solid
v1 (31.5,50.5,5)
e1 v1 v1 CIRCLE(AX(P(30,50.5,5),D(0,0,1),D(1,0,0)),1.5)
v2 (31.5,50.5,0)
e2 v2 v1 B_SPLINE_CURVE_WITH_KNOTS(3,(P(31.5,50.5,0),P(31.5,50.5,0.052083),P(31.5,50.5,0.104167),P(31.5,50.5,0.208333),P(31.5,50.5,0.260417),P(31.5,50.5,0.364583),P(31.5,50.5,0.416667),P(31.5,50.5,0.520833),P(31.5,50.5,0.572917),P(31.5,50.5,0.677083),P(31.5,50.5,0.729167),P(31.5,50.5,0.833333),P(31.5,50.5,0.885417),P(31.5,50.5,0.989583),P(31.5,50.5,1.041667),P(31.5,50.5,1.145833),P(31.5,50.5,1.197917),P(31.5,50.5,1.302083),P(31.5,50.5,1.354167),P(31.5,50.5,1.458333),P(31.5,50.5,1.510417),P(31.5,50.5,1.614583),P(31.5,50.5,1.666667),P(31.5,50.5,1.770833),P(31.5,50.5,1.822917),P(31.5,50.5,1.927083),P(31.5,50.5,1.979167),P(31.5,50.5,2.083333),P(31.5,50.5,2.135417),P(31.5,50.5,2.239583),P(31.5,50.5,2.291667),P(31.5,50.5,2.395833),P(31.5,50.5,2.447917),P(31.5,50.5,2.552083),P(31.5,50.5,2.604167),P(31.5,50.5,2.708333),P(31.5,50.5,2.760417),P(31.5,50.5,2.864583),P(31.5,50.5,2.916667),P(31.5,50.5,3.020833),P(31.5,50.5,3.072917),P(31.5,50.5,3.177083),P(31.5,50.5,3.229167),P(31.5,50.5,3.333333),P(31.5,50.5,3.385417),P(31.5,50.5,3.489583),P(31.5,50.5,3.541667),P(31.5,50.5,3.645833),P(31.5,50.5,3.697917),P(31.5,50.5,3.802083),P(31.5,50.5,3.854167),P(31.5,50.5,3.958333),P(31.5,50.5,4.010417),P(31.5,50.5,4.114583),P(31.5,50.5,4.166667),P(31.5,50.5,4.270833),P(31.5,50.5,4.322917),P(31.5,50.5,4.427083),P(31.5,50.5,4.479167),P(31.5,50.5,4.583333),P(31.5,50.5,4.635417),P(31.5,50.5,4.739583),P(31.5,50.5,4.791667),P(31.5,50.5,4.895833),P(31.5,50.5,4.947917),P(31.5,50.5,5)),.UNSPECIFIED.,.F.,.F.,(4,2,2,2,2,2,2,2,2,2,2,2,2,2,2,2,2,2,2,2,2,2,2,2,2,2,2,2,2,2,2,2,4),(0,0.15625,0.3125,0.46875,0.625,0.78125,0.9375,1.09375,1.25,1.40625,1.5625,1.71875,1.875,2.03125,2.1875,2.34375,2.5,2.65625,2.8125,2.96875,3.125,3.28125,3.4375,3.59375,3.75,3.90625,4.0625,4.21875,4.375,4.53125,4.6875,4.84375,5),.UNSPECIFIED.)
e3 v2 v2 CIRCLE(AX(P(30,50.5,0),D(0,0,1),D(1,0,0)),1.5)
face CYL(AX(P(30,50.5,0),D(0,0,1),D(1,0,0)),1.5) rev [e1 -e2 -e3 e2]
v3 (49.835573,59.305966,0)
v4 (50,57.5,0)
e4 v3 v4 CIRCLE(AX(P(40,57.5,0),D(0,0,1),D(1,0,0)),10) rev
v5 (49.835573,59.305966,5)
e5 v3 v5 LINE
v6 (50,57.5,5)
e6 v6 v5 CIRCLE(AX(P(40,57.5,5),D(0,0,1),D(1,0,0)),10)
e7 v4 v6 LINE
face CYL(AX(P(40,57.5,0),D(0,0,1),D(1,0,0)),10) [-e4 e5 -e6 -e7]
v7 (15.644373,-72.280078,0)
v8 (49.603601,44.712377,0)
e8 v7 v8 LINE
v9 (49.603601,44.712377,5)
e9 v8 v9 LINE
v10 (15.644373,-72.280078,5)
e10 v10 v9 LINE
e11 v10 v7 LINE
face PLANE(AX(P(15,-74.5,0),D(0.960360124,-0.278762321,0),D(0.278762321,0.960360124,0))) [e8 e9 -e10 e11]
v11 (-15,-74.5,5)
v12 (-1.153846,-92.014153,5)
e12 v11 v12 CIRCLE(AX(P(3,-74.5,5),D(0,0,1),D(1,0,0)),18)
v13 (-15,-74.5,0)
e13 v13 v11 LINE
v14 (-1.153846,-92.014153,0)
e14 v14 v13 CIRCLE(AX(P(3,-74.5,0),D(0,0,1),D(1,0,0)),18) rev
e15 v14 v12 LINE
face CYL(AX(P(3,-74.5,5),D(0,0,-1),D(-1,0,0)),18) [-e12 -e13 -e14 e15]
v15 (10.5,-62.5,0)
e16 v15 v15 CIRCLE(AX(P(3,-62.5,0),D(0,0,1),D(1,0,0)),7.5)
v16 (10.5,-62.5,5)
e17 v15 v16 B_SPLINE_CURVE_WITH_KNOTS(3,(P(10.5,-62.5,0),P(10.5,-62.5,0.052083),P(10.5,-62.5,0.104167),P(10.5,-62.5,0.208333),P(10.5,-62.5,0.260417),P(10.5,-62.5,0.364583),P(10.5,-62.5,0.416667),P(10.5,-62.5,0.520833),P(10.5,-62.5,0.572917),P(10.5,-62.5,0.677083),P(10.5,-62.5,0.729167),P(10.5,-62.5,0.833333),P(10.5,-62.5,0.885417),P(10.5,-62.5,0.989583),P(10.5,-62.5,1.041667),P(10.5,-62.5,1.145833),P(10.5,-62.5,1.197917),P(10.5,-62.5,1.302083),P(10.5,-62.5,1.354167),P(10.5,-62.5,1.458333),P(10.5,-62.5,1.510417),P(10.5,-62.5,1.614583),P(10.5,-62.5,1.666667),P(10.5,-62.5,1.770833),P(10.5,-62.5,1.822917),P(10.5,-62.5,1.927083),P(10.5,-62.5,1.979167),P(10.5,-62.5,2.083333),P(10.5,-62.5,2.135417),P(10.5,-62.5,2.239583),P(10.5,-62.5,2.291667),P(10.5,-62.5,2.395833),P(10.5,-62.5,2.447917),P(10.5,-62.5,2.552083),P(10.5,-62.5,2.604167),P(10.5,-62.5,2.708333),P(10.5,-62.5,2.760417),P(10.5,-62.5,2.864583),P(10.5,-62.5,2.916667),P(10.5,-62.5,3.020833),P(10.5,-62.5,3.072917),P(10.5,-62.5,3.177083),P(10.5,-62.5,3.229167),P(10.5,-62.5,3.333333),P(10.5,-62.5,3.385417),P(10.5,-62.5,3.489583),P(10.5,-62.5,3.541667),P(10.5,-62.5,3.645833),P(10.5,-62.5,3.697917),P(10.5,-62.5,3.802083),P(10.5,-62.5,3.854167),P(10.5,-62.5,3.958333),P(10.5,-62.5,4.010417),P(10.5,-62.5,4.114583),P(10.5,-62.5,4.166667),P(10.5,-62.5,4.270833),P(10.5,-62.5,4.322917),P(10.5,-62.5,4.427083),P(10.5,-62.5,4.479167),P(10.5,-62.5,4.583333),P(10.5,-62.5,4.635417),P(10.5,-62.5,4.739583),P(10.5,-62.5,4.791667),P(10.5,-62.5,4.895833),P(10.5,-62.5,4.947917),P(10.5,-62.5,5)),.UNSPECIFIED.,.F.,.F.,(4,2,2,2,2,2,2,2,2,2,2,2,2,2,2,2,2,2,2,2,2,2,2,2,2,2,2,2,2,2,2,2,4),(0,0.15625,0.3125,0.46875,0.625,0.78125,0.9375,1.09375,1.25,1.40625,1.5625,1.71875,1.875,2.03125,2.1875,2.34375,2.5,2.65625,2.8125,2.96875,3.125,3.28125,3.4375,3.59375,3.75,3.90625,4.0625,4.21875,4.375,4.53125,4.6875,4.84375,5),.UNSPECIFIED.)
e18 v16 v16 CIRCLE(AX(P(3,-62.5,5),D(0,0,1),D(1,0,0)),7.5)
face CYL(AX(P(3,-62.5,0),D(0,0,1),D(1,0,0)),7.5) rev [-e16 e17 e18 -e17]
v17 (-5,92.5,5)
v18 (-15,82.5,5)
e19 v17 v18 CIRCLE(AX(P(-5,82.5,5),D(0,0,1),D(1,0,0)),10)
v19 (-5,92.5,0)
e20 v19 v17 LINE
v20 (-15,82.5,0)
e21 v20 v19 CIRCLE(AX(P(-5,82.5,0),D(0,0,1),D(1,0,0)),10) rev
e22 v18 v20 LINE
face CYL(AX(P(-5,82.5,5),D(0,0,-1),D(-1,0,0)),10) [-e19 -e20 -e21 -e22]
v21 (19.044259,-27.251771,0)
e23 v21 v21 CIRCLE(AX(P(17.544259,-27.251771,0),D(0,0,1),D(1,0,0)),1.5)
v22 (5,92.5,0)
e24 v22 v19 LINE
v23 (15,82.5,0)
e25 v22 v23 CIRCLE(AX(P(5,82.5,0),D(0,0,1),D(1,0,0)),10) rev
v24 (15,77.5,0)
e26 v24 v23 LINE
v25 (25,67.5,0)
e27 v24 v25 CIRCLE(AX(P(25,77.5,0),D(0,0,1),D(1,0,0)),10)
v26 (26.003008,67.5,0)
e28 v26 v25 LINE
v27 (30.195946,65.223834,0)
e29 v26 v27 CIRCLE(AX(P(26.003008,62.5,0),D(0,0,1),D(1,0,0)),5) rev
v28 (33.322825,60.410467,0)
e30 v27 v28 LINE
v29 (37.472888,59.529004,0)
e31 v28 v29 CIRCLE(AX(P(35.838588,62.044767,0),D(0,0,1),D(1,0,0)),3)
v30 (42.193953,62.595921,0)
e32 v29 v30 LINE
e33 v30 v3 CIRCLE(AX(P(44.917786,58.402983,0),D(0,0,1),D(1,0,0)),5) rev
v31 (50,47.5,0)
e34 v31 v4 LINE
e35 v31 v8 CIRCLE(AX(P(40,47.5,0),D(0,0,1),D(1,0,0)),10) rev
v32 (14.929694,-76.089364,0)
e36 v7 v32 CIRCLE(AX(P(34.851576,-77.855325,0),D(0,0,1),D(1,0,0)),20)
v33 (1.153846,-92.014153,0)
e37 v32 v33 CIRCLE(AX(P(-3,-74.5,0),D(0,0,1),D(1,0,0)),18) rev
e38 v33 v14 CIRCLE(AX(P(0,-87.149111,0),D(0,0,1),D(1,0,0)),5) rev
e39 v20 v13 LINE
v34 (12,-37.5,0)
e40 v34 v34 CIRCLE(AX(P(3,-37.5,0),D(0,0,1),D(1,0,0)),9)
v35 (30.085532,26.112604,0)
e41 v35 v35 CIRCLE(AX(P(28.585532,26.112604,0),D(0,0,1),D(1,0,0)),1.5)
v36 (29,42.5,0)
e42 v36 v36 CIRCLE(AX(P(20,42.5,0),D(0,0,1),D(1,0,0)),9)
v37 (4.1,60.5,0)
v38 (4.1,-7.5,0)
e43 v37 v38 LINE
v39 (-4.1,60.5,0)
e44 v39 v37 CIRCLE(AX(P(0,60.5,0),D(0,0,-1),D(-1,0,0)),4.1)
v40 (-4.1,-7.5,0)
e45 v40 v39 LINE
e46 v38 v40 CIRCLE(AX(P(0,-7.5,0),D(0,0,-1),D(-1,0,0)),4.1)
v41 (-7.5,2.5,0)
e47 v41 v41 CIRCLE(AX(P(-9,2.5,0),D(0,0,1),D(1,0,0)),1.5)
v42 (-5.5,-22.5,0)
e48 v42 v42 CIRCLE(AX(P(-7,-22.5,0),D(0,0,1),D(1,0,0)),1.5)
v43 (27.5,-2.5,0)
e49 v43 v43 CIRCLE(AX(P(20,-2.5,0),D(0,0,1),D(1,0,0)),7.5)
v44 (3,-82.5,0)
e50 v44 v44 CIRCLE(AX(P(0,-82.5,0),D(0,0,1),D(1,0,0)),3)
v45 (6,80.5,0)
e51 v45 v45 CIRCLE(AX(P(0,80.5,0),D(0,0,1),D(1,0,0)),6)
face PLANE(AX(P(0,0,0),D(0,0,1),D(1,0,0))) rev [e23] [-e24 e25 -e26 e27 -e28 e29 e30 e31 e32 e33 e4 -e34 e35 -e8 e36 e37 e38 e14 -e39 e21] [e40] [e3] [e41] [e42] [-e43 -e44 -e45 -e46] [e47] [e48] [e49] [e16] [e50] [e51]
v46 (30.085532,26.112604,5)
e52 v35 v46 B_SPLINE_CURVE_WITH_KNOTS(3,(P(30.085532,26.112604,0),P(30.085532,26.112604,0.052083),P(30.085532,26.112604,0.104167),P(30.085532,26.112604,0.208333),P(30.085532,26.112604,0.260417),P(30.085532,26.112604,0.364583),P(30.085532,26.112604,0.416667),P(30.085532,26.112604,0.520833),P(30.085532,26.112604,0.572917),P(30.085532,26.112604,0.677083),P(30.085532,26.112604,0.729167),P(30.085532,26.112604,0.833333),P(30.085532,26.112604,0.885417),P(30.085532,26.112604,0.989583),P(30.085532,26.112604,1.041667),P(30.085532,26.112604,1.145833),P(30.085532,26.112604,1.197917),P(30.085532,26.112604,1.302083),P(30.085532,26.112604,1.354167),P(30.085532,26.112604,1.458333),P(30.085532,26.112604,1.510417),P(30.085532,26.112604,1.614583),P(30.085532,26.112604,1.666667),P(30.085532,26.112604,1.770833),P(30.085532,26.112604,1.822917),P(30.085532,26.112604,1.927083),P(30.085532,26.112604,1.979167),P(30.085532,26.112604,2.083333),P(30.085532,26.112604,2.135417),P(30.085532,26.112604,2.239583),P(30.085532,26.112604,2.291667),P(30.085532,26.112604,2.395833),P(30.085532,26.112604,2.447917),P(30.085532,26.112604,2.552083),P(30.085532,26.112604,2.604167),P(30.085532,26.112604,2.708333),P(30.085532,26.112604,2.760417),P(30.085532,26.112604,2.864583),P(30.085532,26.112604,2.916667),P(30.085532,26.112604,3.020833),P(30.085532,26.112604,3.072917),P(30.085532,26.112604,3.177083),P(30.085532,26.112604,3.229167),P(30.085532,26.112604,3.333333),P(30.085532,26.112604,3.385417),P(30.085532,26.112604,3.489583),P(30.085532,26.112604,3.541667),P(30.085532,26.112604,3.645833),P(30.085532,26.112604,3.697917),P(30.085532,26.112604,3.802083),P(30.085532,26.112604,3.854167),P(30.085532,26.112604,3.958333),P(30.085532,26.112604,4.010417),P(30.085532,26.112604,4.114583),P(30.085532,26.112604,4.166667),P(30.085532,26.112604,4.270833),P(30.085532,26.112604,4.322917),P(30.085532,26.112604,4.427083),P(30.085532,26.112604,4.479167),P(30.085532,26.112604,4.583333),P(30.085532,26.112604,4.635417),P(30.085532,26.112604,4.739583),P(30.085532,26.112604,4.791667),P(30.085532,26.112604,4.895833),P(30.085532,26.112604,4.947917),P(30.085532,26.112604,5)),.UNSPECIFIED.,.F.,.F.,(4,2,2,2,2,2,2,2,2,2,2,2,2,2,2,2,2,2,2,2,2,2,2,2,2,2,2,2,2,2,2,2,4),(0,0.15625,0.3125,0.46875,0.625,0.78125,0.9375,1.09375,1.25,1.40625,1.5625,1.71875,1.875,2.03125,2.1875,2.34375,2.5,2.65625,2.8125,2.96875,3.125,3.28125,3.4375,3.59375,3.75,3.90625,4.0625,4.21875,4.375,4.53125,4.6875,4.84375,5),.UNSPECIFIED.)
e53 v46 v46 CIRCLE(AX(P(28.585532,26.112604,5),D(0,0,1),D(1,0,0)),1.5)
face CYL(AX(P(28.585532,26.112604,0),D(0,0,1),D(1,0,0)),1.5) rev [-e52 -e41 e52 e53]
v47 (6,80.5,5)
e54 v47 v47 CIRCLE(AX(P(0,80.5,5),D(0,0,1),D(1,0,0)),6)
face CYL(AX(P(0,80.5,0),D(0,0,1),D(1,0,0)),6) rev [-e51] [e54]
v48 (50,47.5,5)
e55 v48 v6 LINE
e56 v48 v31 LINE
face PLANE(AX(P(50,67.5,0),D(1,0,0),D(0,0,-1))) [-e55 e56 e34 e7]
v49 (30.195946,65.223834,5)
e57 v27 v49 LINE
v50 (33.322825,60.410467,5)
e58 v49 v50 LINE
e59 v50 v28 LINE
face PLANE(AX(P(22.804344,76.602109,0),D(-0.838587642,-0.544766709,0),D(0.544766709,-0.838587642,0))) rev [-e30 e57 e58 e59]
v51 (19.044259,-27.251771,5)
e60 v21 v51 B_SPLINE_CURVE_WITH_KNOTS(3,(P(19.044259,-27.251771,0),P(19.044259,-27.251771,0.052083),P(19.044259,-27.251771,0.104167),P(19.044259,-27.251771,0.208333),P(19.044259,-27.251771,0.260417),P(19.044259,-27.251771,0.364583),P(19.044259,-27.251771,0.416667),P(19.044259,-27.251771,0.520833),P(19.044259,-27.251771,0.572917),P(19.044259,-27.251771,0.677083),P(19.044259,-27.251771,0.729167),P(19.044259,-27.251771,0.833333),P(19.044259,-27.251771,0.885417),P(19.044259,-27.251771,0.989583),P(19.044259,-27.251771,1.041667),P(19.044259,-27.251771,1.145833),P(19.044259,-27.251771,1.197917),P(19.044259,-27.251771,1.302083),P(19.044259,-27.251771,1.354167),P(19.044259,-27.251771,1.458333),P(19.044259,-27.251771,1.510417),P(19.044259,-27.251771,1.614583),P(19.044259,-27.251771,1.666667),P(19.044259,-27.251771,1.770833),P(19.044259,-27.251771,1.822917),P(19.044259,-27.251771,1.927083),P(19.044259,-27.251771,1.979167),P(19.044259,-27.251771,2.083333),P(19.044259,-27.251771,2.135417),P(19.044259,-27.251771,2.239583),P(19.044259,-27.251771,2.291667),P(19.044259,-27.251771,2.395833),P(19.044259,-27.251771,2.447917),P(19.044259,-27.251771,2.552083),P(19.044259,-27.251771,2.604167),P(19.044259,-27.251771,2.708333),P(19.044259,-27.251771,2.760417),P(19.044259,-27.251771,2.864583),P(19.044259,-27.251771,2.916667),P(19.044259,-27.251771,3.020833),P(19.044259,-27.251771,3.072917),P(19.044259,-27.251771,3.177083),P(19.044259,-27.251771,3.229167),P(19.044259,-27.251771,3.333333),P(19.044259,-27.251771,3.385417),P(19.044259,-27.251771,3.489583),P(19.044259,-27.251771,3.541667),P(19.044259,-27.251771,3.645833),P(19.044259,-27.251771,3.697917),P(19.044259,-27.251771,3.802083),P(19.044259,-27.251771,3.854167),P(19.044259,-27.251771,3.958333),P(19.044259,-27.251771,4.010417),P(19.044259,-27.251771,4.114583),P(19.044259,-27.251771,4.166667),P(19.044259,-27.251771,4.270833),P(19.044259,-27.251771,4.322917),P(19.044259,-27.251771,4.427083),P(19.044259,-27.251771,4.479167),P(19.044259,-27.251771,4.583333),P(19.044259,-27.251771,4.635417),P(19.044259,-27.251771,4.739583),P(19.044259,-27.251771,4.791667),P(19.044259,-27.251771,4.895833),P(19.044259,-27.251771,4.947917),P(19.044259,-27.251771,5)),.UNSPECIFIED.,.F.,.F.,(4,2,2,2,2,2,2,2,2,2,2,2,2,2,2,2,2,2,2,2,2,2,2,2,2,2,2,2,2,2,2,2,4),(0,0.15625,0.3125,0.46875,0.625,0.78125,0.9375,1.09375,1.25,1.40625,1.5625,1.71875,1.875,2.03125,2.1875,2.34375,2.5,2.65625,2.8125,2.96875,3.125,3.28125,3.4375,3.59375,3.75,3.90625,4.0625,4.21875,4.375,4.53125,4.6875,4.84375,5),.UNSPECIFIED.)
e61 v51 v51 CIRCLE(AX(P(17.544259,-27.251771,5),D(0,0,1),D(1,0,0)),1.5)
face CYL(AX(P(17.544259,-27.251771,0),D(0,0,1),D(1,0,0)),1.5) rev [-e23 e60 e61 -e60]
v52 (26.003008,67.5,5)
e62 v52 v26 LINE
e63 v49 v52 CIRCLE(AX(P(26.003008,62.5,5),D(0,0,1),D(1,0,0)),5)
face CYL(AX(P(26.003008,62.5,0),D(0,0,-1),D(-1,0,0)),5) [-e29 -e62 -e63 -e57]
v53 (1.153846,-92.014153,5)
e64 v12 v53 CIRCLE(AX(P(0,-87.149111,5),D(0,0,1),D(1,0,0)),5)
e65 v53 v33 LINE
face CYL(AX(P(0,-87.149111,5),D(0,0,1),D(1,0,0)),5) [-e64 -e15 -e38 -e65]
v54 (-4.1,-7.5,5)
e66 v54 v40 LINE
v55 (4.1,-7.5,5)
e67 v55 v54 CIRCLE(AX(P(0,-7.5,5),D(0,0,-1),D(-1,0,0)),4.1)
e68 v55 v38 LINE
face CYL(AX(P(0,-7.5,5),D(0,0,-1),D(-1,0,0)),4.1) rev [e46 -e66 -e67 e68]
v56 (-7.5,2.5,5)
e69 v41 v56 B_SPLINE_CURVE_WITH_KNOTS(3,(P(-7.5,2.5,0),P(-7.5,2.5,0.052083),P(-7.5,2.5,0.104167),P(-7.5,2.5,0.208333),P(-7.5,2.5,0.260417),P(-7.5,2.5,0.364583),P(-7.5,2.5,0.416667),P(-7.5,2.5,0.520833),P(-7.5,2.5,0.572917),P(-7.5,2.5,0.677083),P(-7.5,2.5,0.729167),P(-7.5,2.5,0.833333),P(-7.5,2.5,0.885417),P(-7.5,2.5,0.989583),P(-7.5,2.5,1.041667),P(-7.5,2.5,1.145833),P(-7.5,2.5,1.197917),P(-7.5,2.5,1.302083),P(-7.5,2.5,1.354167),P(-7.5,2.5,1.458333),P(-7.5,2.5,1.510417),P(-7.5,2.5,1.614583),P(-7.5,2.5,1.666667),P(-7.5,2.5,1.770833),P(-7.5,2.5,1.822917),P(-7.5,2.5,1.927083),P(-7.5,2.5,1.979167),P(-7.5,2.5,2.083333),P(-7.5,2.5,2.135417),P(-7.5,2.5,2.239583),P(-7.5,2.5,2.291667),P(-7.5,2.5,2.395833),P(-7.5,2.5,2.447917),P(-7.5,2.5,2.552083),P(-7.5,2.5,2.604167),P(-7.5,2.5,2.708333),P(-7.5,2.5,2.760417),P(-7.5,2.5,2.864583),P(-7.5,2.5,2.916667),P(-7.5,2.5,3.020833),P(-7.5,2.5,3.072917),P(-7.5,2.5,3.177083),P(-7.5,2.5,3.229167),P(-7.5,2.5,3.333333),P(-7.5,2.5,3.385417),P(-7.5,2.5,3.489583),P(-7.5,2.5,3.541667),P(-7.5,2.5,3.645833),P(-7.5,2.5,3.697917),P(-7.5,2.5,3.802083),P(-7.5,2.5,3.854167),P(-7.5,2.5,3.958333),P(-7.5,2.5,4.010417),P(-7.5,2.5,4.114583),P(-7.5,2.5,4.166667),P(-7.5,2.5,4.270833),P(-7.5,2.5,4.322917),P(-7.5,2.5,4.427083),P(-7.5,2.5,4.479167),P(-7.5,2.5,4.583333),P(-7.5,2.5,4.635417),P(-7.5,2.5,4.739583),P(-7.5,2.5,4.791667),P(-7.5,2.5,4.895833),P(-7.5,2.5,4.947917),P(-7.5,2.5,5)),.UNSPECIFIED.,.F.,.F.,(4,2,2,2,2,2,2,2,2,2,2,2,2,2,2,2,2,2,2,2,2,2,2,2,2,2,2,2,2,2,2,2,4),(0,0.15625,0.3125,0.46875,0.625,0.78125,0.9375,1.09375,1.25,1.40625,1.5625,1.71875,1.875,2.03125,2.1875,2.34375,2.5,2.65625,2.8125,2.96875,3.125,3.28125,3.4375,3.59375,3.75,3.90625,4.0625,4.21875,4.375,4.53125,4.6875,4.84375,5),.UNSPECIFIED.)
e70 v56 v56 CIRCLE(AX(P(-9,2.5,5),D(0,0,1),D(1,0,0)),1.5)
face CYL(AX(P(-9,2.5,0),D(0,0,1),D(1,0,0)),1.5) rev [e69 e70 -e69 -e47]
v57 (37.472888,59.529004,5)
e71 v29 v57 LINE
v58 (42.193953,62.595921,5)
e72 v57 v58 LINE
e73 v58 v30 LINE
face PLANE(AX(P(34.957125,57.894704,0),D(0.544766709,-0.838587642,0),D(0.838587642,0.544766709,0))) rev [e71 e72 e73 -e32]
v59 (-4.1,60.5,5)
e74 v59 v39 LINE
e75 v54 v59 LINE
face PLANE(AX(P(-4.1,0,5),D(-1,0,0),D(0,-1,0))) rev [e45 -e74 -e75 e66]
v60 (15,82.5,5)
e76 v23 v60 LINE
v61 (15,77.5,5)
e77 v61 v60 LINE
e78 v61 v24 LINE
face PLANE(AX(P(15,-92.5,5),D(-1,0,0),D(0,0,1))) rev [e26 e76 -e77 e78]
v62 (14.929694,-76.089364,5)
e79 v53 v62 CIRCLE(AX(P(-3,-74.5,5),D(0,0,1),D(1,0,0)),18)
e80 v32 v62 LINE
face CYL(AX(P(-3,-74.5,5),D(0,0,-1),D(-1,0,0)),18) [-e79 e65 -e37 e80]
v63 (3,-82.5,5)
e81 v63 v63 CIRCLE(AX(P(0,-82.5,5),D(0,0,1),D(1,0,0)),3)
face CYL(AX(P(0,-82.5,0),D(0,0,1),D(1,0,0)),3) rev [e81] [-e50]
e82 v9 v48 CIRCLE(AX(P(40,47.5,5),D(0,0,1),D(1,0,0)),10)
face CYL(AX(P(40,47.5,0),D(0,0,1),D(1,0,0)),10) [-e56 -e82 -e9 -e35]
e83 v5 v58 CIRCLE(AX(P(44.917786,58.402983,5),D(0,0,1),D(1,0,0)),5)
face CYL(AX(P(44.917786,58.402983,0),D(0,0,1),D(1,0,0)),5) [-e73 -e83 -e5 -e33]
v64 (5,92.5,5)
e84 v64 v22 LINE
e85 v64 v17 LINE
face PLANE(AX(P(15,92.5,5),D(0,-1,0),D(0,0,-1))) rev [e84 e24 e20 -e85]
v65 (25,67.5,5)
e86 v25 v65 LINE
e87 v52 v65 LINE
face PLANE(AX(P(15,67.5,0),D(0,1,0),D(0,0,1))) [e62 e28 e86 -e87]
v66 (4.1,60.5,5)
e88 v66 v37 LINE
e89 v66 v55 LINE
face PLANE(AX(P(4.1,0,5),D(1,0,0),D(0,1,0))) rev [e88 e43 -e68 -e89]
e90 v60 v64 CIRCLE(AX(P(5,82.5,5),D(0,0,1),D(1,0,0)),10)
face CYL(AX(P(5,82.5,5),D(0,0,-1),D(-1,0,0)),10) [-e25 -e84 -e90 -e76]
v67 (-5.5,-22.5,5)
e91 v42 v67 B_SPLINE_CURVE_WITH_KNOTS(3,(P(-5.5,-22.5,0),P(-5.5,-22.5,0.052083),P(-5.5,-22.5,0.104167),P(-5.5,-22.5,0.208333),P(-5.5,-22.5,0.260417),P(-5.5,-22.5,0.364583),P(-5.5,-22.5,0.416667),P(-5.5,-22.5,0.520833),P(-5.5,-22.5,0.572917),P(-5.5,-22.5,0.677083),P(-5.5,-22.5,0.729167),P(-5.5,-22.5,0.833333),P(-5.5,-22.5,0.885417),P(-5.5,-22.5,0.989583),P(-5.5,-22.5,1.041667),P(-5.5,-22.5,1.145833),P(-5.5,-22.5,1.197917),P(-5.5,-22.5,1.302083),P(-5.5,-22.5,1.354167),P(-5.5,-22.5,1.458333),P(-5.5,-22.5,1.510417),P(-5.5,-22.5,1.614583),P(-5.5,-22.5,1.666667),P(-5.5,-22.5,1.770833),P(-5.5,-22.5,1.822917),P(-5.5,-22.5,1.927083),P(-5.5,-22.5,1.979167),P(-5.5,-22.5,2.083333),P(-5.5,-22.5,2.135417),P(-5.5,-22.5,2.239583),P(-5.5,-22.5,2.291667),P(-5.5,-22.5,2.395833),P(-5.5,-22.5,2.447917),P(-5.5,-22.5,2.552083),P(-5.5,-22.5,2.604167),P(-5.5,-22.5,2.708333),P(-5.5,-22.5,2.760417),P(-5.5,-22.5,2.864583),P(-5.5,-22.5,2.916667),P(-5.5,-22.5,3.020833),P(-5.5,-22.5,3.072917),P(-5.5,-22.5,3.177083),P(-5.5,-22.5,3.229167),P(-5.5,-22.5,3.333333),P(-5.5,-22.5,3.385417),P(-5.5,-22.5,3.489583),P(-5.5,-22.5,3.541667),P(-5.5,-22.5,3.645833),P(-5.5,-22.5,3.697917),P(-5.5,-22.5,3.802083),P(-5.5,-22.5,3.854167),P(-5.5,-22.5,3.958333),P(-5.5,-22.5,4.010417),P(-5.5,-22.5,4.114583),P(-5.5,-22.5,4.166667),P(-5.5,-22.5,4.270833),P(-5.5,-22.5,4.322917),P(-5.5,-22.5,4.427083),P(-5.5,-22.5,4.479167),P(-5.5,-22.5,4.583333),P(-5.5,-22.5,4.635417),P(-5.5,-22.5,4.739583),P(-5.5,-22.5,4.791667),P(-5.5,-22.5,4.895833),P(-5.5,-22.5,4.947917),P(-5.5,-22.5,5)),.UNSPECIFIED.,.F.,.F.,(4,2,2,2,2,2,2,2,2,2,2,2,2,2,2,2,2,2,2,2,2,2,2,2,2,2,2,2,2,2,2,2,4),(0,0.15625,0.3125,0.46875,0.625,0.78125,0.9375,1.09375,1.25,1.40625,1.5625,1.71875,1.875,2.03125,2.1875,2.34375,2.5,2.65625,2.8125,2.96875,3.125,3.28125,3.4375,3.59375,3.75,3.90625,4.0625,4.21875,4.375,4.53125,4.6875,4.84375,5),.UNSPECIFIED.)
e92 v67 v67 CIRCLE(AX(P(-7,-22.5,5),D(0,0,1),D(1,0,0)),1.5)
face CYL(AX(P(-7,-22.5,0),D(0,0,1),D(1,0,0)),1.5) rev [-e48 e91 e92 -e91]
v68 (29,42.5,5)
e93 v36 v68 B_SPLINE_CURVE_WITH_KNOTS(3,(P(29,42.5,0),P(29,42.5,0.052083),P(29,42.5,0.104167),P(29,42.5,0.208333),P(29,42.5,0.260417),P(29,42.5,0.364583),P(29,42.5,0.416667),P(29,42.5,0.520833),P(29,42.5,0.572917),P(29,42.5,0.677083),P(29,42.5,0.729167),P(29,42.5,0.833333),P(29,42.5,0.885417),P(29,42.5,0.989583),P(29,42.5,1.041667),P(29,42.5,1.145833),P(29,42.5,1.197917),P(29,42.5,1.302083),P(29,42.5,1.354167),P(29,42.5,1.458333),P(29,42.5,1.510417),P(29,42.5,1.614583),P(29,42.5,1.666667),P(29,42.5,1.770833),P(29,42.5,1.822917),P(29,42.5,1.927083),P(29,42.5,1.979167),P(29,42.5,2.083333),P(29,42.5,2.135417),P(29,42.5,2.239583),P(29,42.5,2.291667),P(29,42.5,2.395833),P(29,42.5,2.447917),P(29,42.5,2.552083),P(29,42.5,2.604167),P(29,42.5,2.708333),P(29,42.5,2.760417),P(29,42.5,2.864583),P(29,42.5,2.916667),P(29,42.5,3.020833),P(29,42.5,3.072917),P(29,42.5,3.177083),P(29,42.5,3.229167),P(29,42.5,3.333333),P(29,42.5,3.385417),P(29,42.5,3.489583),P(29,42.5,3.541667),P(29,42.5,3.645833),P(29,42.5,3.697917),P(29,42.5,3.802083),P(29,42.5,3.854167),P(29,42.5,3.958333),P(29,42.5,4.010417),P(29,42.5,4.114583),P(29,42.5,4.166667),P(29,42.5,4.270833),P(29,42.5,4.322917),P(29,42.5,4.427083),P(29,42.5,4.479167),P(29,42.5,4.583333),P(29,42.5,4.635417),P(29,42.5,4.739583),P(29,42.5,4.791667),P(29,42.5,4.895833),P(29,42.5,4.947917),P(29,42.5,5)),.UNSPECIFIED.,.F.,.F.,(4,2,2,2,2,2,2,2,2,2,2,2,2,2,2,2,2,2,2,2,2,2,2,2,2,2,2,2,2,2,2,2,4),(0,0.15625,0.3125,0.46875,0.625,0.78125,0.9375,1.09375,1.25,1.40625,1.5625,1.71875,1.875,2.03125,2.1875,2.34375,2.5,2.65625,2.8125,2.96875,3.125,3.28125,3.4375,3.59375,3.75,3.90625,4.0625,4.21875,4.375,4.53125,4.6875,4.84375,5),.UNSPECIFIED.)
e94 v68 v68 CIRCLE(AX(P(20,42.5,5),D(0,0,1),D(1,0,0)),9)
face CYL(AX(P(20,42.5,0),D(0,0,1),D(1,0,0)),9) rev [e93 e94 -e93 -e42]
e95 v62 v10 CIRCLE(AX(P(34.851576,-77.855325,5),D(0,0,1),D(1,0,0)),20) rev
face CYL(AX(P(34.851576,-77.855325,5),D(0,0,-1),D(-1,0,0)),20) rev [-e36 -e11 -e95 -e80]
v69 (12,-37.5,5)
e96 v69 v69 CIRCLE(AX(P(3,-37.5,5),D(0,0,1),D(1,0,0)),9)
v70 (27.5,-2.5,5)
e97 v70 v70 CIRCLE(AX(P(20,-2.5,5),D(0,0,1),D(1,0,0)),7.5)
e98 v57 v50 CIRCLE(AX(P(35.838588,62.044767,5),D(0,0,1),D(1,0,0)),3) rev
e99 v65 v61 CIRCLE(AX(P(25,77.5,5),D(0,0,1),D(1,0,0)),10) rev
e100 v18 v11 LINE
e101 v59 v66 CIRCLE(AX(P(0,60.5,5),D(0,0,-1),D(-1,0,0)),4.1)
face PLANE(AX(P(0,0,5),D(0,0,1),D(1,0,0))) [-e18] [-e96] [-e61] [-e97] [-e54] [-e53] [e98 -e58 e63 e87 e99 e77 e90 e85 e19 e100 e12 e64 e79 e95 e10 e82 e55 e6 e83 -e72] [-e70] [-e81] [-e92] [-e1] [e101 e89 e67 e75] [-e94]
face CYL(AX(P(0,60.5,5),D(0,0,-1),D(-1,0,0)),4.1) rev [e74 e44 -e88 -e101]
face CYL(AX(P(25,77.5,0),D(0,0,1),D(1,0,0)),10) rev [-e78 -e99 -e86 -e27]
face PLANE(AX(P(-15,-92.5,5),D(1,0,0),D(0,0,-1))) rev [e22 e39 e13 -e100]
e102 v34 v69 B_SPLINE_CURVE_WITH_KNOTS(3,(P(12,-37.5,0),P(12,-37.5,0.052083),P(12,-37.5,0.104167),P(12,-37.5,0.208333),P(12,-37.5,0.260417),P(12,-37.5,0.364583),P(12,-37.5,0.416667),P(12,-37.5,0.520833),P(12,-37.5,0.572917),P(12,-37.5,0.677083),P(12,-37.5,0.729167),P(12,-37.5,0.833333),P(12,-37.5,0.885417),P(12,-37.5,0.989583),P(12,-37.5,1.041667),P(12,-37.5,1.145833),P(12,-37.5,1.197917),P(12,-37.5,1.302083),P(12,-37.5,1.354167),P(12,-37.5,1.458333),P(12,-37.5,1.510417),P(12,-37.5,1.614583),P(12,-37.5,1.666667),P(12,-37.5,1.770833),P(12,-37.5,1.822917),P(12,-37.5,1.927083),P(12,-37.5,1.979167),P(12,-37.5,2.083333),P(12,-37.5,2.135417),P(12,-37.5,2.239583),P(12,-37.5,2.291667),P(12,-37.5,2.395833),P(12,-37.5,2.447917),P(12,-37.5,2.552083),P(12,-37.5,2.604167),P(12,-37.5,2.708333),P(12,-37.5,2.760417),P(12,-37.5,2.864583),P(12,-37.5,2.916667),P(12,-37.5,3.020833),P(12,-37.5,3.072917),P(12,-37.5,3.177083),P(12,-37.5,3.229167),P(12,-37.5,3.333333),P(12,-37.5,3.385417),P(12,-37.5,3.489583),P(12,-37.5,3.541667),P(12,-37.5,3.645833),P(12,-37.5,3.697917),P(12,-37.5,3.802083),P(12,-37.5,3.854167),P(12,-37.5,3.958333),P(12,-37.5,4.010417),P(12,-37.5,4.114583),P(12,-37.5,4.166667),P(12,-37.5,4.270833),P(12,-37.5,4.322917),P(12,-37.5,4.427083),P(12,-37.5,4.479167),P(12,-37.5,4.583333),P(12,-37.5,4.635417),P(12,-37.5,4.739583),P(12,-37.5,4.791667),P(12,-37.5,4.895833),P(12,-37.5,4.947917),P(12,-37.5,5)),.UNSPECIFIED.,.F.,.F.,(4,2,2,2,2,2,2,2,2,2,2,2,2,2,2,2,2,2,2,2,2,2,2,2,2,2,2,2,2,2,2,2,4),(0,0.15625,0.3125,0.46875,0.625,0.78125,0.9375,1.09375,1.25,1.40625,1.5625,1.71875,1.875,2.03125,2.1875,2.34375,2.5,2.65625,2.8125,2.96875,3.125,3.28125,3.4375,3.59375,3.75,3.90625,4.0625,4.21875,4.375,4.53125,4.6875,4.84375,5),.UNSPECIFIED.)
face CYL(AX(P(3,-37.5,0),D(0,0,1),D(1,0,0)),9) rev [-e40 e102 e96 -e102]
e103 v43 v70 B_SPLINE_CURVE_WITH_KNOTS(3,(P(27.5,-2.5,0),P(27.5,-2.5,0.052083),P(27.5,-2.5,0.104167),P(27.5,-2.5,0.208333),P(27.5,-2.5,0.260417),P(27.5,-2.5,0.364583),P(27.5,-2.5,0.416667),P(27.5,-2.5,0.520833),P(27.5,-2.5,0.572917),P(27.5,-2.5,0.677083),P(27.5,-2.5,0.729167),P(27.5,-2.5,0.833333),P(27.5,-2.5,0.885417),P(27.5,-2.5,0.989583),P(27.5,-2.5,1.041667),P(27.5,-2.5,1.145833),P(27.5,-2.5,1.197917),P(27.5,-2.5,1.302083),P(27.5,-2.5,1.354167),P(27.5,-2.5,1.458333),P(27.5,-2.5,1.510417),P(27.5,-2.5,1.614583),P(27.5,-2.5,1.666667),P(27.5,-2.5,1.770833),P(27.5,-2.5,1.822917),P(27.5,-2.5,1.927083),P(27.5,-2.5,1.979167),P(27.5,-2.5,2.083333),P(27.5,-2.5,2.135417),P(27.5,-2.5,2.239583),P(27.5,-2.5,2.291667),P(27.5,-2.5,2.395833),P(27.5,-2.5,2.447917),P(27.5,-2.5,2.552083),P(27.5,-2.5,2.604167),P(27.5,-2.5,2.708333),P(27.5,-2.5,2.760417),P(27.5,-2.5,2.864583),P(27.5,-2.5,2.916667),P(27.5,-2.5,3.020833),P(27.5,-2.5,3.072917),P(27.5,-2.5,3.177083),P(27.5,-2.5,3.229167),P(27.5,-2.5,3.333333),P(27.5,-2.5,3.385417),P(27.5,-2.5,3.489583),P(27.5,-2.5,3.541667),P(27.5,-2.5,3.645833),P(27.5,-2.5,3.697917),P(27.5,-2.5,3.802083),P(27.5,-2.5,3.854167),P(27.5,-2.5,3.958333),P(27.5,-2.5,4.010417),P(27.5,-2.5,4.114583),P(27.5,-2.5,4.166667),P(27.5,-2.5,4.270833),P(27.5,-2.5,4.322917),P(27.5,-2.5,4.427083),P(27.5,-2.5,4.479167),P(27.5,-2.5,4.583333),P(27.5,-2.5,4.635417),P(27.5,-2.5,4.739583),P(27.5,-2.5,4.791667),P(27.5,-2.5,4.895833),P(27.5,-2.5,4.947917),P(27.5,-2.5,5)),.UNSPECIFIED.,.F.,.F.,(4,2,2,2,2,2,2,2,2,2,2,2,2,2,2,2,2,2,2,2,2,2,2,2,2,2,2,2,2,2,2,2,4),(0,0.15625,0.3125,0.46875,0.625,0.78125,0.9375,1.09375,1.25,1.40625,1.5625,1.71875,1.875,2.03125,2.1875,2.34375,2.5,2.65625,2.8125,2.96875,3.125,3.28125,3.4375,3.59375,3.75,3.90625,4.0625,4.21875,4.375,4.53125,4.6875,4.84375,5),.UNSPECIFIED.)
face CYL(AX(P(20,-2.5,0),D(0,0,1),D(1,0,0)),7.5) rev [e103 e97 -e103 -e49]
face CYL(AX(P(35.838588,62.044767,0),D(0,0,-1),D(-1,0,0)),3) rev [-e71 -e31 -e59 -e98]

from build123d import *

# Parameters (mm, degrees)
SKETCH_1_W          = 30
SKETCH_1_H          = 185
EXTRUDE_1_DEPTH     = 5
SKETCH_2_R          = 6
SKETCH_2_R_2        = 3
CUT_EXTRUDE_1_DEPTH = 94.841621896
FILLET_1_R          = 10
SKETCH_5_W          = 35
SKETCH_5_H          = 30
EXTRUDE_3_DEPTH     = 5
FILLET_4_R          = 10
FILLET_5_R          = 18
CUT_EXTRUDE_3_DEPTH = 5
CUT_EXTRUDE_4_DEPTH = 5
EXTRUDE_START       = -5
EXTRUDE_5_DEPTH     = 5
SKETCH_11_R         = 1.5
CUT_EXTRUDE_5_DEPTH = 106.267516357
SKETCH_12_R         = 9
SKETCH_12_R_2       = 7.5
CUT_EXTRUDE_6_DEPTH = 106.267516357
CUT_EXTRUDE_7_DEPTH = 106.267516357
FILLET_9_R          = 5
FILLET_10_R         = 3
FILLET_11_R         = 5
FILLET_12_R         = 20


with BuildPart() as part:
    # 草图1 → 凸台-拉伸1 (new body)
    with BuildSketch(Plane.XY):
        Rectangle(SKETCH_1_W, SKETCH_1_H)
    extrude(amount=EXTRUDE_1_DEPTH)

    # 草图2 → 切除-拉伸1 (cut, through all)
    with BuildSketch(Plane.XY.offset(5)):
        with Locations((0, 80.5)):
            Circle(SKETCH_2_R)
        with Locations((0, -82.5)):
            Circle(SKETCH_2_R_2)
    extrude(amount=-CUT_EXTRUDE_1_DEPTH, mode=Mode.SUBTRACT)

    # 圆角1
    fillet_1_edges = [part.edges().sort_by_distance(p)[0] for p in [
        (-15, 92.5, 2.5),
        (15, 92.5, 2.5),
    ]]
    fillet(fillet_1_edges, radius=FILLET_1_R)

    # 草图5 → 凸台-拉伸3 (add)
    with BuildSketch(Plane.XY.offset(5)):
        with Locations((32.5, 52.5)):
            Rectangle(SKETCH_5_W, SKETCH_5_H)
    extrude(amount=-EXTRUDE_3_DEPTH)

    # 圆角4
    fillet_4_edges = [part.edges().sort_by_distance(p)[0] for p in [
        (15, 37.5, 2.5),
        (15, 67.5, 2.5),
        (50, 67.5, 2.5),
        (50, 37.5, 2.5),
    ]]
    fillet(fillet_4_edges, radius=FILLET_4_R)

    # 圆角5
    # the kernel refuses this fillet: 18 mm, written as the material it takes off along each edge
    with BuildSketch(Plane(origin=(-15, -92.5, -45), x_dir=(0, 1, 0), z_dir=(0, 0, 1)), Plane(origin=(15, -92.5, -45), x_dir=(-1, 0, 0), z_dir=(0, 0, 1))) as fillet_5_piece_1:
        with BuildLine():
            CenterArc((FILLET_5_R, -FILLET_5_R), FILLET_5_R, 90, 90)
            Line((0, -FILLET_5_R), (0, 0))
            Line((0, 0), (FILLET_5_R, 0))
        make_face()
    extrude(amount=95, mode=Mode.SUBTRACT)

    # 草图8 → 切除-拉伸3 (cut)
    with BuildSketch(Plane(origin=(0, 0, 0), x_dir=(-1, 0, 0), z_dir=(0, 0, -1))):
        with BuildLine():
            Line((-4.1, 60.5), (-4.1, -7.5))
            ThreePointArc((-4.1, -7.5), (0, -11.6), (4.1, -7.5))
            Line((4.1, -7.5), (4.1, 60.5))
            ThreePointArc((4.1, 60.5), (0, 64.6), (-4.1, 60.5))
        make_face()
    extrude(amount=-CUT_EXTRUDE_3_DEPTH, mode=Mode.SUBTRACT)

    # 草图9 → 切除-拉伸4 (cut)
    with BuildSketch(Plane.XY.offset(5)):
        Polygon((22.949354722, 80.050183125), (35, 61.5), (47.495924497, 69.617653207), align=None)
    extrude(amount=-CUT_EXTRUDE_4_DEPTH, mode=Mode.SUBTRACT)

    # 草图10 → 凸台-拉伸5 (add)
    with BuildSketch(Plane.XY.offset(5).offset(EXTRUDE_START)):
        with BuildLine():
            Line((25, 37.5), (40, 37.5))
            ThreePointArc((40, 37.5), (46.005154783, 39.503868684), (49.603601244, 44.712376794))
            Line((49.603601244, 44.712376794), (15, -74.5))
            Line((15, -74.5), (15, 27.5))
            ThreePointArc((15, 27.5), (17.928932188, 34.571067812), (25, 37.5))
        make_face()
    extrude(amount=EXTRUDE_5_DEPTH)

    # 草图11 → 切除-拉伸5 (cut, through all)
    with BuildSketch(Plane.XY.offset(5)):
        with Locations((-7, -22.5)):
            Circle(SKETCH_11_R)
        with Locations((17.544259481, -27.251770883)):
            Circle(SKETCH_11_R)
        with Locations((18.828850642, -7.5)):
            Circle(SKETCH_11_R)
        with Locations((28.585531862, 26.112604356)):
            Circle(SKETCH_11_R)
        with Locations((30, 50.5)):
            Circle(SKETCH_11_R)
        with Locations((-9, 2.5)):
            Circle(SKETCH_11_R)
    extrude(amount=-CUT_EXTRUDE_5_DEPTH, mode=Mode.SUBTRACT)

    # 草图12 → 切除-拉伸6 (cut, through all)
    with BuildSketch(Plane.XY.offset(5)):
        with Locations((20, 42.5)):
            Circle(SKETCH_12_R)
        with Locations((20, -2.5)):
            Circle(SKETCH_12_R_2)
        with Locations((3, -37.5)):
            Circle(SKETCH_12_R)
        with Locations((3, -62.5)):
            Circle(SKETCH_12_R_2)
    extrude(amount=-CUT_EXTRUDE_6_DEPTH, mode=Mode.SUBTRACT)

    # 草图13 → 切除-拉伸7 (cut, through all)
    with BuildSketch(Plane.XY.offset(5)):
        Polygon((22.804344395, 76.602108744), (34.957124842, 57.894703657), (54.492950931, 70.585646319), align=None)
    extrude(amount=-CUT_EXTRUDE_7_DEPTH, mode=Mode.SUBTRACT)

    # 圆角9
    fillet_9_edges = [part.edges().sort_by_distance(p)[0] for p in [
        (46.30180901, 65.264483447, 2.5),
        (28.717293233, 67.5, 2.5),
    ]]
    fillet(fillet_9_edges, radius=FILLET_9_R)

    # 圆角10
    fillet_10_edges = [part.edges().sort_by_distance(p)[0] for p in [
        (34.957124842, 57.894703657, 2.5),
    ]]
    fillet(fillet_10_edges, radius=FILLET_10_R)

    # 圆角11
    fillet_11_edges = [part.edges().sort_by_distance(p)[0] for p in [
        (0, -92.248239349, 2.5),
    ]]
    fillet(fillet_11_edges, radius=FILLET_11_R)

    # 圆角12
    fillet_12_edges = [part.edges().sort_by_distance(p)[0] for p in [
        (15, -74.5, 2.5),
    ]]
    fillet(fillet_12_edges, radius=FILLET_12_R)


solid = part.part
